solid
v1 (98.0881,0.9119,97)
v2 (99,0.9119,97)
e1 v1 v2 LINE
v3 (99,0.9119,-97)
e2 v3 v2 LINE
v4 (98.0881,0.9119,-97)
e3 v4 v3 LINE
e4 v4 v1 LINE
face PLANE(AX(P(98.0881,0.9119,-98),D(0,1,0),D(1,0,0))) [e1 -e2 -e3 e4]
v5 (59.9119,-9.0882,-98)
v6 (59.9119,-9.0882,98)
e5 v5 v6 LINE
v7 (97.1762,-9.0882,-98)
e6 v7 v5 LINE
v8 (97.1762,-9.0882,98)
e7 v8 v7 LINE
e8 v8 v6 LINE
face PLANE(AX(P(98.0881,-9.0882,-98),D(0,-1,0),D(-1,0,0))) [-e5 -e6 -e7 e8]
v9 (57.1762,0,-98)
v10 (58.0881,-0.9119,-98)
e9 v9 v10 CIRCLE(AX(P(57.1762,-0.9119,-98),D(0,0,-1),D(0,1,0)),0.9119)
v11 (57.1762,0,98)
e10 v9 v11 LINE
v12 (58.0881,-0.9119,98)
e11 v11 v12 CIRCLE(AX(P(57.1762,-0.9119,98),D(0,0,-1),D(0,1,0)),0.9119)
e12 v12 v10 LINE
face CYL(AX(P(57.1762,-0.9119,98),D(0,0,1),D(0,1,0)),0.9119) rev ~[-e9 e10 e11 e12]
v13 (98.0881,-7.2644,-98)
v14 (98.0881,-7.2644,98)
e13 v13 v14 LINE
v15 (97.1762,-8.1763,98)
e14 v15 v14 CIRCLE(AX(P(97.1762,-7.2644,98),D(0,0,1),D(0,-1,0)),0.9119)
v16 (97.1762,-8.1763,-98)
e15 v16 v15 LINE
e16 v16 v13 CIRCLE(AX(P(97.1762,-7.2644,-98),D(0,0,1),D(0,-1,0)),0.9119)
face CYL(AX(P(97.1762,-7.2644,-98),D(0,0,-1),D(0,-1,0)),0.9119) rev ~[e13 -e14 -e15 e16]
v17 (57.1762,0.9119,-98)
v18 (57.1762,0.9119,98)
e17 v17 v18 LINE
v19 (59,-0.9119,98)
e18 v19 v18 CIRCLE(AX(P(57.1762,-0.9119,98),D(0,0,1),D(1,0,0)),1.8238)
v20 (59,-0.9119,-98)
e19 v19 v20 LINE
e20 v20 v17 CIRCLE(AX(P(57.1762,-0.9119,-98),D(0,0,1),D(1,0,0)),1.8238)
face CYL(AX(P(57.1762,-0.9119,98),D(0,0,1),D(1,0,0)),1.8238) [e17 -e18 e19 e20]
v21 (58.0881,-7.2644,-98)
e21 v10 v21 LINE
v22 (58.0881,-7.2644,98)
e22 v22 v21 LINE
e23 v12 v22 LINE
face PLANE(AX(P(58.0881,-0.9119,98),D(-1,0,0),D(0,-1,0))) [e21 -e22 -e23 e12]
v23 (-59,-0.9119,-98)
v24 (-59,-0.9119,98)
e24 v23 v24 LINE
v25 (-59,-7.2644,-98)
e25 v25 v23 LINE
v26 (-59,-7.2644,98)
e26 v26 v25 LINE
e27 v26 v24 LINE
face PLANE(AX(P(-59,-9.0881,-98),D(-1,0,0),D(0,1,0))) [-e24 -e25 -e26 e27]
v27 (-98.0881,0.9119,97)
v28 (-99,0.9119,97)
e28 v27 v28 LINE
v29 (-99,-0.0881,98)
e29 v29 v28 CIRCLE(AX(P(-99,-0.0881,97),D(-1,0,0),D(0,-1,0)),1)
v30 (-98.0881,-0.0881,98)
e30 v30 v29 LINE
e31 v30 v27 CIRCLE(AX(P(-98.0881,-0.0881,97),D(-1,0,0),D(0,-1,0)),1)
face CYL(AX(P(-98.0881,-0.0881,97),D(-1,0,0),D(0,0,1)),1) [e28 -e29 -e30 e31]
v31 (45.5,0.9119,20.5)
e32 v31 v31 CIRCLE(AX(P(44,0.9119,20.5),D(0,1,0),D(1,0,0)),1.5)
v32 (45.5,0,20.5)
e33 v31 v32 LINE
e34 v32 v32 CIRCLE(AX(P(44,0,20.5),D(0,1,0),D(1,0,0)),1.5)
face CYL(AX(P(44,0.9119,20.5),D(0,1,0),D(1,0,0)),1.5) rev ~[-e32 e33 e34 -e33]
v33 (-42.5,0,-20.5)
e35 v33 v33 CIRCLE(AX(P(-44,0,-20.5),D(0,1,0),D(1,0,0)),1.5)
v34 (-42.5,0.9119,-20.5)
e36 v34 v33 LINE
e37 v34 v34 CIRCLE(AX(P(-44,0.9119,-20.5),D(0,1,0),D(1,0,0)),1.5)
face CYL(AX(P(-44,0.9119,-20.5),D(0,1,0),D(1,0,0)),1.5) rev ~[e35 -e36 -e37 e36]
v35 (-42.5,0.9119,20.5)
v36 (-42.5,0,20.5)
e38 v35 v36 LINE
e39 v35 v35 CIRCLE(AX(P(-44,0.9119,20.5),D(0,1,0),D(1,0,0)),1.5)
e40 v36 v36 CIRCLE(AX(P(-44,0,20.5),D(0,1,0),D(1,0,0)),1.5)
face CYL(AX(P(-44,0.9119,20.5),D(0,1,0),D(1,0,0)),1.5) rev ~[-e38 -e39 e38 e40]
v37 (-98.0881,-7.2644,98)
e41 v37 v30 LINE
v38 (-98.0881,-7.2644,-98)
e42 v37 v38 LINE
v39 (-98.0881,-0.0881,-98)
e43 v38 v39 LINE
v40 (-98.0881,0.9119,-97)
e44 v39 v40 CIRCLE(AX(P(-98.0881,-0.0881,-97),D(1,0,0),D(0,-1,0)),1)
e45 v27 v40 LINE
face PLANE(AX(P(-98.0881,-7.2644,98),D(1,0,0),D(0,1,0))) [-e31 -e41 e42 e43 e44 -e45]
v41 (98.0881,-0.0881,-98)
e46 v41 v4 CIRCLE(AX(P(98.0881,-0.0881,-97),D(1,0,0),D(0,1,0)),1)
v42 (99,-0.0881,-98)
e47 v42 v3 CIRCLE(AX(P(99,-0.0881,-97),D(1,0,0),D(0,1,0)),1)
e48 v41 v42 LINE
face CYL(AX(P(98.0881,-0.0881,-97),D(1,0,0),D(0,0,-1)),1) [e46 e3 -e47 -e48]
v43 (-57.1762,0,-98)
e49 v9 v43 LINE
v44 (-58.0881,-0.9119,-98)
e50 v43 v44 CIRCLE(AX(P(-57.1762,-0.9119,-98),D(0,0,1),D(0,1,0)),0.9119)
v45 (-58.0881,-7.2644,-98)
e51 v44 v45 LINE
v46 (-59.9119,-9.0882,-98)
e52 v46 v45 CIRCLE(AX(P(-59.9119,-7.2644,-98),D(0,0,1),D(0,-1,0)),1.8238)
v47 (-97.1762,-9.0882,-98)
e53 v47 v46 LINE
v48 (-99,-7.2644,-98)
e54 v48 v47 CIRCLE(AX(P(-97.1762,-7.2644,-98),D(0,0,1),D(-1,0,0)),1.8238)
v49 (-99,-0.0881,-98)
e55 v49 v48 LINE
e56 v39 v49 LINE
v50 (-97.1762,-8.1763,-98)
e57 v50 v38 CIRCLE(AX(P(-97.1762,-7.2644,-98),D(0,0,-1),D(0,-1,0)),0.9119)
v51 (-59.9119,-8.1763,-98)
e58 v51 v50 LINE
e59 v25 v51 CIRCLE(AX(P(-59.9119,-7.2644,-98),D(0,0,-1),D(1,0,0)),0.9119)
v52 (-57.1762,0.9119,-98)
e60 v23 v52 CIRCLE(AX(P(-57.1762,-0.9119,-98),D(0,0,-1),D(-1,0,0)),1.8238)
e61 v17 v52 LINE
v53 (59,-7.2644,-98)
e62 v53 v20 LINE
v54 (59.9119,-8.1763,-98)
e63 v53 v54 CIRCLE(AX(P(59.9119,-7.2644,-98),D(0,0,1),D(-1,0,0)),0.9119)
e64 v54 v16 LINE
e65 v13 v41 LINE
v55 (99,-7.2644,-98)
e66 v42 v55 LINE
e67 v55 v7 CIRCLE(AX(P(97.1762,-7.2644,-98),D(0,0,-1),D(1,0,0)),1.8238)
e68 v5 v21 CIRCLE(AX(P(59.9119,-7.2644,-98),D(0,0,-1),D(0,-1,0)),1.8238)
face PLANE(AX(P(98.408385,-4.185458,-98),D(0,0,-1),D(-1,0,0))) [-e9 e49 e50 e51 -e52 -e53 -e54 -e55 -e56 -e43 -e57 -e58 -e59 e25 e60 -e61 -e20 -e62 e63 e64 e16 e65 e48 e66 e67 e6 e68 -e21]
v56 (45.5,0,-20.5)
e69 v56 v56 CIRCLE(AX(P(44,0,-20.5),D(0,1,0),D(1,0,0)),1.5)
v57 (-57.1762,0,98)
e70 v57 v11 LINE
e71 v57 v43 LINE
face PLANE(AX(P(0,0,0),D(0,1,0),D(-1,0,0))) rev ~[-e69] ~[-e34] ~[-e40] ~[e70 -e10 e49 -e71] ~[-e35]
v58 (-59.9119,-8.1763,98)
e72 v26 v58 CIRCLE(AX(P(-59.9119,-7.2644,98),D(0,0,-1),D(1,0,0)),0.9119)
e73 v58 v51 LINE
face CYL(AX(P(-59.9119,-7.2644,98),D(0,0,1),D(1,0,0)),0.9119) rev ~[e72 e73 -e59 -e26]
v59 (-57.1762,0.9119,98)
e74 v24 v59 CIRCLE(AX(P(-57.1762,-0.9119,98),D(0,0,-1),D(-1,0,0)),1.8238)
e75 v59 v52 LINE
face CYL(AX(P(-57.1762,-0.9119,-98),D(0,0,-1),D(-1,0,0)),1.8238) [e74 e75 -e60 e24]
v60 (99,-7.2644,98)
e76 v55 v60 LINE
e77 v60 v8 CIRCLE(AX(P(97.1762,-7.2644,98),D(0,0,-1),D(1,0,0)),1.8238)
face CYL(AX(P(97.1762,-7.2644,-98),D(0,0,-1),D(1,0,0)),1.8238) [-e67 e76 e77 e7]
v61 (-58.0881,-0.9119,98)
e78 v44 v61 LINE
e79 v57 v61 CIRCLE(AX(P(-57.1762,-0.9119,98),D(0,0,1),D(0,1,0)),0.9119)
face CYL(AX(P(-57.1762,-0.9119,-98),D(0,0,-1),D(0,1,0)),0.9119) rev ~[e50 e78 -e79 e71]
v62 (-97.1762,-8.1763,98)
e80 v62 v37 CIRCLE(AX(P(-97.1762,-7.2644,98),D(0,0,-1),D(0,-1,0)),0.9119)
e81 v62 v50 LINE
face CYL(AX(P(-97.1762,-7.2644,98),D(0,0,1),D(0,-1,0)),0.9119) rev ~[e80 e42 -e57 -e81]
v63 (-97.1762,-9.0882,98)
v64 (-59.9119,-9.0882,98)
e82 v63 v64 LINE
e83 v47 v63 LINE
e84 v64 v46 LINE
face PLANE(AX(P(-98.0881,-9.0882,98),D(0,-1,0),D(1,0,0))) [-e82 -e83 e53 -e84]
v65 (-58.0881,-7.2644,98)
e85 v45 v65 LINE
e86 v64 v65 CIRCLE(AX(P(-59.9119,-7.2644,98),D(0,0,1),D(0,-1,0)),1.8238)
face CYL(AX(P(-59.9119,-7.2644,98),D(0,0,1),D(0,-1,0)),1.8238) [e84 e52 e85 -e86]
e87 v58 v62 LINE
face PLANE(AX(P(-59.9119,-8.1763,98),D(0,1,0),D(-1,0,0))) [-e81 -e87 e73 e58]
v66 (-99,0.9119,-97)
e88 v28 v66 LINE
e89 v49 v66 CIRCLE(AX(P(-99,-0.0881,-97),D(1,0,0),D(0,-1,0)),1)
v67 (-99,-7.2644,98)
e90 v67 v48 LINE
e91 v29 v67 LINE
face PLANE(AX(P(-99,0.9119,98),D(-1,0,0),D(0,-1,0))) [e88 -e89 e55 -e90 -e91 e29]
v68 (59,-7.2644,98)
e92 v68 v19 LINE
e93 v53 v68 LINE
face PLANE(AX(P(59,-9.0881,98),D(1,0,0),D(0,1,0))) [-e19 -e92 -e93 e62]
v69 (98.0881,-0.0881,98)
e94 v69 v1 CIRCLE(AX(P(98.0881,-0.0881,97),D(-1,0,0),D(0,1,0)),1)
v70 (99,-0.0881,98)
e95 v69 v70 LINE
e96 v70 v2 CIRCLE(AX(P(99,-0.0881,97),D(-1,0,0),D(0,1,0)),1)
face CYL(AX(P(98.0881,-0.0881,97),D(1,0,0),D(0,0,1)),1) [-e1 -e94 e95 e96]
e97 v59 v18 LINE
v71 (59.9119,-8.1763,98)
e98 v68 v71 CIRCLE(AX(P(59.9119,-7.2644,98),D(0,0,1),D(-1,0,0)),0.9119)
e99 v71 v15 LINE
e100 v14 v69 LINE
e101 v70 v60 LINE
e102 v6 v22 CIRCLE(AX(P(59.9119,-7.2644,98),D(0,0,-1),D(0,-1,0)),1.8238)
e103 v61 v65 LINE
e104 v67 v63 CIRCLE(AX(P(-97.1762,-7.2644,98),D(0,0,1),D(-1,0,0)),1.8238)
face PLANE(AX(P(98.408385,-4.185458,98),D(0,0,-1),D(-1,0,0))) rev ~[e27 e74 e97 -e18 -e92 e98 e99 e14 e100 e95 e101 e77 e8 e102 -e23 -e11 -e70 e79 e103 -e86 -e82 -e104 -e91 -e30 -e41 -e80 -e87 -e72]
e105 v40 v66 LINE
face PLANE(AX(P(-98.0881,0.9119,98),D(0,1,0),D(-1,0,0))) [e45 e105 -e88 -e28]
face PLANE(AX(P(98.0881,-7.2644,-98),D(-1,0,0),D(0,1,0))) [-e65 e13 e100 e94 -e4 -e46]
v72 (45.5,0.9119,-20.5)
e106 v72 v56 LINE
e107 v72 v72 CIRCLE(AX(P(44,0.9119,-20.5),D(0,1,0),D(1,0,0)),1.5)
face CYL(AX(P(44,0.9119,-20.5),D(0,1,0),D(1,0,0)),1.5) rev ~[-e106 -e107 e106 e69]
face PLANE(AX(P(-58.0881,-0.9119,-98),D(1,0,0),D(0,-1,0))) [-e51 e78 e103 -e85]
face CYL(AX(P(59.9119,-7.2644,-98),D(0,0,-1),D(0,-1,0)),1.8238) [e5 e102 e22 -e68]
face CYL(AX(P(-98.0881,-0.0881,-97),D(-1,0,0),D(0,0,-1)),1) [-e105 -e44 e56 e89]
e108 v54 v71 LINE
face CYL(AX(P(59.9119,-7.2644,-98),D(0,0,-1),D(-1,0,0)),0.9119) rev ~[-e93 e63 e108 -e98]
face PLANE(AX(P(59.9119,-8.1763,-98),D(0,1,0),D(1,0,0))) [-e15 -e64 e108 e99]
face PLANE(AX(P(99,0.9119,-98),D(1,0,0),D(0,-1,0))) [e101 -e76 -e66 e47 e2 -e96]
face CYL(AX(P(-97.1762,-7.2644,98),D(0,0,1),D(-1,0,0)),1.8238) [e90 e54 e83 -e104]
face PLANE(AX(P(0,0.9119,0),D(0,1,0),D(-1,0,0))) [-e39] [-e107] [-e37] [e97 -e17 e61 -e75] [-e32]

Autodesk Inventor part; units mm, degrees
ref_plane "YZ Plane" through (0, 0, 0) normal (1, 0, 0) x (0, 1, 0)
ref_plane "XZ Plane" through (0, 0, 0) normal (0, 1, 0) x (-1, 0, 0)
ref_plane "XY Plane" through (0, 0, 0) normal (0, 0, 1) x (1, 0, 0)
sketch "Sketch1" plane through (0, 0, 0) normal (0, 1, 0) x (-1, 0, 0)
  line L0 (-59, -98) -> (59, -98)
  line L1 (59, -98) -> (59, 98)
  line L2 (59, 98) -> (-59, 98)
  line L3 (-59, 98) -> (-59, -98)
  line L4 (-59, -98) -> (59, 98) construction
  line L5 (59, -98) -> (-59, 98) construction
  point P0 (0, 0)
  dimension "d0" = 118
  dimension "d1" = 196
extrude "Plate1" add sketch "Sketch1" along normal blind 0.9119
sketch "Sketch2" plane through (58.0881, 0.9119, 98) normal (1, 0, 0) x (0, 1, 0)
  line L0 (0, -196) -> (0, 0)
  line L1 (0, 0) -> (-10, 0)
  line L2 (-10, 0) -> (-10, -196)
  line L3 (-10, -196) -> (0, -196)
edge flange "Flange1" height 10 angle 90 thickness 0.9119 bend radius 0.9119 thickness toward (1, 0, 0) relief tear relief width 0.9119 relief depth 0.4559 corner gap 0.9119 corner form 0 edges at (59, 0, 0) (-59, 0, 0) wall of the first edge with corners at (58.0881, 0.9119, -98) (58.0881, 0.9119, 98) (58.0881, -9.0881, 98) (58.0881, -9.0881, -98)
bend "Bend1"
corner "Corner1"
sketch "Sketch3" plane through (58.0881, -8.1763, -98) normal (0, -1, 0) x (1, 0, 0)
  line L0 (0, 196) -> (0, 0)
  line L1 (0, 0) -> (40, 0)
  line L2 (40, 0) -> (40, 196)
  line L3 (40, 196) -> (0, 196)
edge flange "Flange2" height 40 angle 90 thickness 0.9119 bend radius 0.9119 thickness toward (0, -1, 0) relief tear relief width 0.9119 relief depth 0.4559 corner gap 0.9119 corner form 0 edges at (59, -9.0881, 0) (-59, -9.0881, 0) wall of the first edge with corners at (58.0881, -8.1763, 98) (58.0881, -8.1763, -98) (98.0881, -8.1763, -98) (98.0881, -8.1763, 98)
bend "Bend2"
corner "Corner2"
sketch "Sketch4" plane through (98.0881, -8.1763, -98) normal (1, 0, 0) x (0, 1, 0)
  line L0 (0, 196) -> (0, 0)
  line L1 (0, 0) -> (9.0881, 0)
  line L2 (9.0881, 0) -> (9.0881, 196)
  line L3 (9.0881, 196) -> (0, 196)
edge flange "Flange3" height 10 angle 90 thickness 0.9119 bend radius 0.9119 thickness toward (1, 0, 0) relief tear relief width 0.9119 relief depth 0.4559 corner gap 0.9119 corner form 0 edges at (98.0881, -8.1763, 0) (-98.0881, -8.1763, 0) wall of the first edge with corners at (98.0881, -8.1763, 98) (98.0881, -8.1763, -98) (98.0881, 0.9119, -98) (98.0881, 0.9119, 98)
bend "Bend3"
corner "Corner3"
sketch "Sketch5" plane through (0, 0.9119, 0) normal (0, 1, 0) x (1, 0, 0)
  line L0 (0, 0) -> (-59, 0)
  line L1 (-59, 0) -> (-59, 98)
  line L2 (-59, 98) -> (0, 98)
  line L3 (0, 98) -> (0, 0)
  line L4 (140, -28) -> (-140, -28)
  line L5 (-140, -28) -> (-140, 28)
  line L6 (-140, 28) -> (140, 28)
  line L7 (140, 28) -> (140, -28)
  line L8 (140, -28) -> (-140, 28) construction
  line L9 (-140, -28) -> (140, 28) construction
  circle A0 centre (-44, 20.5) radius 1.5
  circle A1 centre (44, 20.5) radius 1.5
  circle A2 centre (-44, -20.5) radius 1.5
  circle A3 centre (44, -20.5) radius 1.5
  dimension "d34" = 280
  dimension "d35" = 56
  dimension "d36" = 3
  dimension "d38" = 44
  dimension "d41" = 20.5
extrude "Cut1" cut sketch "Sketch5" against normal blind 0.9119 contours A0 | A1 | A2 | A3
fillet "Corner Round1" radius 1 4 edges at (-98.5441, 0.9119, 98) (-98.5441, 0.9119, -98) (98.5441, 0.9119, -98) (98.5441, 0.9119, 98)
equation "\"d0\" = foot_x - 2 * frame_border"
equation "\"d1\" = foot_y"
equation "\"d34\" = frame_front_x"
equation "\"d35\" = frame_front_y"
equation "\"d36\" = m3_diameter"
equation "\"d38\" = laser_offset_x - frame_front_fold"
equation "\"d41\" = 0.5 * frame_front_y - 0.5 * frame_front_fold"
equation "\"d39\" = Thickness"
equation "\"d33\" = corner_small_r"
equation "\"Thickness\" = foot_t"
equation "\"d3\" = BendReliefWidth"
equation "\"d4\" = BendReliefDepth"
equation "\"d5\" = MinimumRemnant"
equation "\"d6\" = BendRadius"
equation "\"d7\" = foot_z"
equation "\"d9\" = BendRadius"
equation "\"d10\" = CornerReliefSize"
equation "\"d11\" = GapSize"
equation "\"d12\" = JacobiRadiusSize"
equation "\"d13\" = BendReliefWidth"
equation "\"d14\" = BendReliefDepth"
equation "\"d15\" = MinimumRemnant"
equation "\"d16\" = BendRadius"
equation "\"d17\" = frame_border"
equation "\"d19\" = BendRadius"
equation "\"d20\" = CornerReliefSize"
equation "\"d21\" = GapSize"
equation "\"d22\" = JacobiRadiusSize"
equation "\"d23\" = BendReliefWidth"
equation "\"d24\" = BendReliefDepth"
equation "\"d25\" = MinimumRemnant"
equation "\"d26\" = BendRadius"
equation "\"d27\" = foot_z"
equation "\"d29\" = BendRadius"
equation "\"d30\" = CornerReliefSize"
equation "\"d31\" = GapSize"
equation "\"d32\" = JacobiRadiusSize"
equation "\"BendRadius\" = Thickness"
equation "\"BendReliefWidth\" = Thickness"
equation "\"BendReliefDepth\" = 0.5 * Thickness"
equation "\"CornerReliefSize\" = 4 * Thickness"
equation "\"MinimumRemnant\" = 2 * Thickness"
equation "\"TransitionRadius\" = BendRadius"
equation "\"JacobiRadiusSize\" = BendRadius"
equation "\"GapSize\" = Thickness"
equation "\"laserresin\" = 5"
equation "\"st1_thickness\" = 0.91186"
equation "\"st2_thickness\" = 1.5875"
equation "\"al1_thickness\" = 0.79375"
equation "\"al2_thickness\" = 1.5875"
equation "\"bend_factor\" = 2.26205"
equation "\"st1_bend\" = 2.06267"
equation "\"st2_bend\" = 3.591"
equation "\"st3_bend\" = 113.10236"
equation "\"al1_bend\" = 1.7955"
equation "\"al2_bend\" = 3.591"
equation "\"al3_bend\" = 113.10236"
equation "\"acrylic1_thickness\" = 5.88"
equation "\"acrylic2_thickness\" = 3.15"
equation "\"acrylic3_thickness\" = 3.15"
equation "\"corner_small_r\" = 1"
equation "\"corner_big_r\" = 5"
equation "\"linear_bearing_spacing\" = 208"
equation "\"galvo_y_out_offset\" = 27"
equation "\"galvo_y_in_offset\" = 17.5"
equation "\"laser_diameter\" = 13"
equation "\"nema17_x\" = 43"
equation "\"nema17_shaft\" = 24"
equation "\"lmk8uu_x\" = 25"
equation "\"lmk8uu_shaft\" = 15"
equation "\"lmk8uu_z\" = 24"
equation "\"shf8_y\" = 43"
equation "\"acme_nut_d\" = 19.1"
equation "\"acme_nut_upper_d\" = 12.7"
equation "\"handle_spacing\" = 50.8"
equation "\"handle_d\" = 4.7625"
equation "\"handle_hole_d\" = 2.845"
equation "\"handle_projection\" = 20.6375"
equation "\"switch_spacing\" = 19"
equation "\"laser_body_diameter\" = 12"
equation "\"m3_diameter\" = 3"
equation "\"m3_head\" = 6"
equation "\"m4_diameter\" = 4"
equation "\"m5_diameter\" = 5"
equation "\"m5_head\" = 10.3"
equation "\"rivet1_diameter\" = 3.26"
equation "\"rivet2_diameter\" = 3.26"
equation "\"brass_insert_drill\" = 4"
equation "\"m5_brass_insert_drill\" = 6.7"
equation "\"m3_press_nut_drill\" = 4.24"
equation "\"m5_press_nut_drill\" = 6.35"
equation "\"platform_t\" = 1.5875"
equation "\"platform_z\" = 65"
equation "\"platform_fold_x\" = 15"
equation "\"platform_crane_gap\" = 0.1"
equation "\"platform_gap\" = 0.1"
equation "\"platform_upper_y\" = 46.625"
equation "\"crane_t\" = 1.5875"
equation "\"crane_x\" = 233"
equation "\"crane_gap\" = 0.1"
equation "\"tray_t\" = 5.88"
equation "\"tray_to_platform_oversize\" = 0"
equation "\"reservoir_t\" = 0.91186"
equation "\"reservoir_z\" = 35"
equation "\"reservoir_flap_y\" = 20.91186"
equation "\"frame_front_t\" = 0.91186"
equation "\"frame_front_x\" = 280"
equation "\"frame_front_y\" = 56"
equation "\"frame_front_fold\" = 15"
equation "\"frame_gap\" = 0.1"
equation "\"frame_back_t\" = 0.91186"
equation "\"frame_back_x\" = 277.97628"
equation "\"frame_back_y\" = 53.97628"
equation "\"frame_back_z\" = 497.97628"
equation "\"drawer_t\" = 0.91186"
equation "\"drawer_gap\" = 0.1"
equation "\"drawer_reservoir_overlap_x\" = 24.08814"
equation "\"drawer_x\" = 202.02372"
equation "\"drawer_y\" = 73"
equation "\"drawer_seal_y\" = 101"
equation "\"drawer_window_gap\" = 6"
equation "\"foot_t\" = 0.91186"
equation "\"foot_x\" = 198"
equation "\"foot_y\" = 196"
equation "\"laser_holder_t\" = 0.91186"
equation "\"laser_holder_z\" = 75"
equation "\"laser_offset_x\" = 59"
equation "\"laser_offset_y\" = 8.5"
equation "\"subframe_t\" = 0.79375"
equation "\"subframe_x\" = 66"
equation "\"subframe_y\" = 55"
equation "\"d2\" = BendRadius"
equation "\"shield_y\" = 71"
equation "\"shield_x\" = 200.2"
equation "\"shield_z\" = 259.9"
equation "\"shield_t\" = 3.15"
equation "\"magnet_t\" = 1.6"
equation "\"magnet_w\" = 12.8"
equation "\"sae_4_40_diameter\" = 2.845"
equation "\"frame_border\" = 40"
equation "\"foot_z\" = 10"
properties part number "foot" material "Steel, Mild"
